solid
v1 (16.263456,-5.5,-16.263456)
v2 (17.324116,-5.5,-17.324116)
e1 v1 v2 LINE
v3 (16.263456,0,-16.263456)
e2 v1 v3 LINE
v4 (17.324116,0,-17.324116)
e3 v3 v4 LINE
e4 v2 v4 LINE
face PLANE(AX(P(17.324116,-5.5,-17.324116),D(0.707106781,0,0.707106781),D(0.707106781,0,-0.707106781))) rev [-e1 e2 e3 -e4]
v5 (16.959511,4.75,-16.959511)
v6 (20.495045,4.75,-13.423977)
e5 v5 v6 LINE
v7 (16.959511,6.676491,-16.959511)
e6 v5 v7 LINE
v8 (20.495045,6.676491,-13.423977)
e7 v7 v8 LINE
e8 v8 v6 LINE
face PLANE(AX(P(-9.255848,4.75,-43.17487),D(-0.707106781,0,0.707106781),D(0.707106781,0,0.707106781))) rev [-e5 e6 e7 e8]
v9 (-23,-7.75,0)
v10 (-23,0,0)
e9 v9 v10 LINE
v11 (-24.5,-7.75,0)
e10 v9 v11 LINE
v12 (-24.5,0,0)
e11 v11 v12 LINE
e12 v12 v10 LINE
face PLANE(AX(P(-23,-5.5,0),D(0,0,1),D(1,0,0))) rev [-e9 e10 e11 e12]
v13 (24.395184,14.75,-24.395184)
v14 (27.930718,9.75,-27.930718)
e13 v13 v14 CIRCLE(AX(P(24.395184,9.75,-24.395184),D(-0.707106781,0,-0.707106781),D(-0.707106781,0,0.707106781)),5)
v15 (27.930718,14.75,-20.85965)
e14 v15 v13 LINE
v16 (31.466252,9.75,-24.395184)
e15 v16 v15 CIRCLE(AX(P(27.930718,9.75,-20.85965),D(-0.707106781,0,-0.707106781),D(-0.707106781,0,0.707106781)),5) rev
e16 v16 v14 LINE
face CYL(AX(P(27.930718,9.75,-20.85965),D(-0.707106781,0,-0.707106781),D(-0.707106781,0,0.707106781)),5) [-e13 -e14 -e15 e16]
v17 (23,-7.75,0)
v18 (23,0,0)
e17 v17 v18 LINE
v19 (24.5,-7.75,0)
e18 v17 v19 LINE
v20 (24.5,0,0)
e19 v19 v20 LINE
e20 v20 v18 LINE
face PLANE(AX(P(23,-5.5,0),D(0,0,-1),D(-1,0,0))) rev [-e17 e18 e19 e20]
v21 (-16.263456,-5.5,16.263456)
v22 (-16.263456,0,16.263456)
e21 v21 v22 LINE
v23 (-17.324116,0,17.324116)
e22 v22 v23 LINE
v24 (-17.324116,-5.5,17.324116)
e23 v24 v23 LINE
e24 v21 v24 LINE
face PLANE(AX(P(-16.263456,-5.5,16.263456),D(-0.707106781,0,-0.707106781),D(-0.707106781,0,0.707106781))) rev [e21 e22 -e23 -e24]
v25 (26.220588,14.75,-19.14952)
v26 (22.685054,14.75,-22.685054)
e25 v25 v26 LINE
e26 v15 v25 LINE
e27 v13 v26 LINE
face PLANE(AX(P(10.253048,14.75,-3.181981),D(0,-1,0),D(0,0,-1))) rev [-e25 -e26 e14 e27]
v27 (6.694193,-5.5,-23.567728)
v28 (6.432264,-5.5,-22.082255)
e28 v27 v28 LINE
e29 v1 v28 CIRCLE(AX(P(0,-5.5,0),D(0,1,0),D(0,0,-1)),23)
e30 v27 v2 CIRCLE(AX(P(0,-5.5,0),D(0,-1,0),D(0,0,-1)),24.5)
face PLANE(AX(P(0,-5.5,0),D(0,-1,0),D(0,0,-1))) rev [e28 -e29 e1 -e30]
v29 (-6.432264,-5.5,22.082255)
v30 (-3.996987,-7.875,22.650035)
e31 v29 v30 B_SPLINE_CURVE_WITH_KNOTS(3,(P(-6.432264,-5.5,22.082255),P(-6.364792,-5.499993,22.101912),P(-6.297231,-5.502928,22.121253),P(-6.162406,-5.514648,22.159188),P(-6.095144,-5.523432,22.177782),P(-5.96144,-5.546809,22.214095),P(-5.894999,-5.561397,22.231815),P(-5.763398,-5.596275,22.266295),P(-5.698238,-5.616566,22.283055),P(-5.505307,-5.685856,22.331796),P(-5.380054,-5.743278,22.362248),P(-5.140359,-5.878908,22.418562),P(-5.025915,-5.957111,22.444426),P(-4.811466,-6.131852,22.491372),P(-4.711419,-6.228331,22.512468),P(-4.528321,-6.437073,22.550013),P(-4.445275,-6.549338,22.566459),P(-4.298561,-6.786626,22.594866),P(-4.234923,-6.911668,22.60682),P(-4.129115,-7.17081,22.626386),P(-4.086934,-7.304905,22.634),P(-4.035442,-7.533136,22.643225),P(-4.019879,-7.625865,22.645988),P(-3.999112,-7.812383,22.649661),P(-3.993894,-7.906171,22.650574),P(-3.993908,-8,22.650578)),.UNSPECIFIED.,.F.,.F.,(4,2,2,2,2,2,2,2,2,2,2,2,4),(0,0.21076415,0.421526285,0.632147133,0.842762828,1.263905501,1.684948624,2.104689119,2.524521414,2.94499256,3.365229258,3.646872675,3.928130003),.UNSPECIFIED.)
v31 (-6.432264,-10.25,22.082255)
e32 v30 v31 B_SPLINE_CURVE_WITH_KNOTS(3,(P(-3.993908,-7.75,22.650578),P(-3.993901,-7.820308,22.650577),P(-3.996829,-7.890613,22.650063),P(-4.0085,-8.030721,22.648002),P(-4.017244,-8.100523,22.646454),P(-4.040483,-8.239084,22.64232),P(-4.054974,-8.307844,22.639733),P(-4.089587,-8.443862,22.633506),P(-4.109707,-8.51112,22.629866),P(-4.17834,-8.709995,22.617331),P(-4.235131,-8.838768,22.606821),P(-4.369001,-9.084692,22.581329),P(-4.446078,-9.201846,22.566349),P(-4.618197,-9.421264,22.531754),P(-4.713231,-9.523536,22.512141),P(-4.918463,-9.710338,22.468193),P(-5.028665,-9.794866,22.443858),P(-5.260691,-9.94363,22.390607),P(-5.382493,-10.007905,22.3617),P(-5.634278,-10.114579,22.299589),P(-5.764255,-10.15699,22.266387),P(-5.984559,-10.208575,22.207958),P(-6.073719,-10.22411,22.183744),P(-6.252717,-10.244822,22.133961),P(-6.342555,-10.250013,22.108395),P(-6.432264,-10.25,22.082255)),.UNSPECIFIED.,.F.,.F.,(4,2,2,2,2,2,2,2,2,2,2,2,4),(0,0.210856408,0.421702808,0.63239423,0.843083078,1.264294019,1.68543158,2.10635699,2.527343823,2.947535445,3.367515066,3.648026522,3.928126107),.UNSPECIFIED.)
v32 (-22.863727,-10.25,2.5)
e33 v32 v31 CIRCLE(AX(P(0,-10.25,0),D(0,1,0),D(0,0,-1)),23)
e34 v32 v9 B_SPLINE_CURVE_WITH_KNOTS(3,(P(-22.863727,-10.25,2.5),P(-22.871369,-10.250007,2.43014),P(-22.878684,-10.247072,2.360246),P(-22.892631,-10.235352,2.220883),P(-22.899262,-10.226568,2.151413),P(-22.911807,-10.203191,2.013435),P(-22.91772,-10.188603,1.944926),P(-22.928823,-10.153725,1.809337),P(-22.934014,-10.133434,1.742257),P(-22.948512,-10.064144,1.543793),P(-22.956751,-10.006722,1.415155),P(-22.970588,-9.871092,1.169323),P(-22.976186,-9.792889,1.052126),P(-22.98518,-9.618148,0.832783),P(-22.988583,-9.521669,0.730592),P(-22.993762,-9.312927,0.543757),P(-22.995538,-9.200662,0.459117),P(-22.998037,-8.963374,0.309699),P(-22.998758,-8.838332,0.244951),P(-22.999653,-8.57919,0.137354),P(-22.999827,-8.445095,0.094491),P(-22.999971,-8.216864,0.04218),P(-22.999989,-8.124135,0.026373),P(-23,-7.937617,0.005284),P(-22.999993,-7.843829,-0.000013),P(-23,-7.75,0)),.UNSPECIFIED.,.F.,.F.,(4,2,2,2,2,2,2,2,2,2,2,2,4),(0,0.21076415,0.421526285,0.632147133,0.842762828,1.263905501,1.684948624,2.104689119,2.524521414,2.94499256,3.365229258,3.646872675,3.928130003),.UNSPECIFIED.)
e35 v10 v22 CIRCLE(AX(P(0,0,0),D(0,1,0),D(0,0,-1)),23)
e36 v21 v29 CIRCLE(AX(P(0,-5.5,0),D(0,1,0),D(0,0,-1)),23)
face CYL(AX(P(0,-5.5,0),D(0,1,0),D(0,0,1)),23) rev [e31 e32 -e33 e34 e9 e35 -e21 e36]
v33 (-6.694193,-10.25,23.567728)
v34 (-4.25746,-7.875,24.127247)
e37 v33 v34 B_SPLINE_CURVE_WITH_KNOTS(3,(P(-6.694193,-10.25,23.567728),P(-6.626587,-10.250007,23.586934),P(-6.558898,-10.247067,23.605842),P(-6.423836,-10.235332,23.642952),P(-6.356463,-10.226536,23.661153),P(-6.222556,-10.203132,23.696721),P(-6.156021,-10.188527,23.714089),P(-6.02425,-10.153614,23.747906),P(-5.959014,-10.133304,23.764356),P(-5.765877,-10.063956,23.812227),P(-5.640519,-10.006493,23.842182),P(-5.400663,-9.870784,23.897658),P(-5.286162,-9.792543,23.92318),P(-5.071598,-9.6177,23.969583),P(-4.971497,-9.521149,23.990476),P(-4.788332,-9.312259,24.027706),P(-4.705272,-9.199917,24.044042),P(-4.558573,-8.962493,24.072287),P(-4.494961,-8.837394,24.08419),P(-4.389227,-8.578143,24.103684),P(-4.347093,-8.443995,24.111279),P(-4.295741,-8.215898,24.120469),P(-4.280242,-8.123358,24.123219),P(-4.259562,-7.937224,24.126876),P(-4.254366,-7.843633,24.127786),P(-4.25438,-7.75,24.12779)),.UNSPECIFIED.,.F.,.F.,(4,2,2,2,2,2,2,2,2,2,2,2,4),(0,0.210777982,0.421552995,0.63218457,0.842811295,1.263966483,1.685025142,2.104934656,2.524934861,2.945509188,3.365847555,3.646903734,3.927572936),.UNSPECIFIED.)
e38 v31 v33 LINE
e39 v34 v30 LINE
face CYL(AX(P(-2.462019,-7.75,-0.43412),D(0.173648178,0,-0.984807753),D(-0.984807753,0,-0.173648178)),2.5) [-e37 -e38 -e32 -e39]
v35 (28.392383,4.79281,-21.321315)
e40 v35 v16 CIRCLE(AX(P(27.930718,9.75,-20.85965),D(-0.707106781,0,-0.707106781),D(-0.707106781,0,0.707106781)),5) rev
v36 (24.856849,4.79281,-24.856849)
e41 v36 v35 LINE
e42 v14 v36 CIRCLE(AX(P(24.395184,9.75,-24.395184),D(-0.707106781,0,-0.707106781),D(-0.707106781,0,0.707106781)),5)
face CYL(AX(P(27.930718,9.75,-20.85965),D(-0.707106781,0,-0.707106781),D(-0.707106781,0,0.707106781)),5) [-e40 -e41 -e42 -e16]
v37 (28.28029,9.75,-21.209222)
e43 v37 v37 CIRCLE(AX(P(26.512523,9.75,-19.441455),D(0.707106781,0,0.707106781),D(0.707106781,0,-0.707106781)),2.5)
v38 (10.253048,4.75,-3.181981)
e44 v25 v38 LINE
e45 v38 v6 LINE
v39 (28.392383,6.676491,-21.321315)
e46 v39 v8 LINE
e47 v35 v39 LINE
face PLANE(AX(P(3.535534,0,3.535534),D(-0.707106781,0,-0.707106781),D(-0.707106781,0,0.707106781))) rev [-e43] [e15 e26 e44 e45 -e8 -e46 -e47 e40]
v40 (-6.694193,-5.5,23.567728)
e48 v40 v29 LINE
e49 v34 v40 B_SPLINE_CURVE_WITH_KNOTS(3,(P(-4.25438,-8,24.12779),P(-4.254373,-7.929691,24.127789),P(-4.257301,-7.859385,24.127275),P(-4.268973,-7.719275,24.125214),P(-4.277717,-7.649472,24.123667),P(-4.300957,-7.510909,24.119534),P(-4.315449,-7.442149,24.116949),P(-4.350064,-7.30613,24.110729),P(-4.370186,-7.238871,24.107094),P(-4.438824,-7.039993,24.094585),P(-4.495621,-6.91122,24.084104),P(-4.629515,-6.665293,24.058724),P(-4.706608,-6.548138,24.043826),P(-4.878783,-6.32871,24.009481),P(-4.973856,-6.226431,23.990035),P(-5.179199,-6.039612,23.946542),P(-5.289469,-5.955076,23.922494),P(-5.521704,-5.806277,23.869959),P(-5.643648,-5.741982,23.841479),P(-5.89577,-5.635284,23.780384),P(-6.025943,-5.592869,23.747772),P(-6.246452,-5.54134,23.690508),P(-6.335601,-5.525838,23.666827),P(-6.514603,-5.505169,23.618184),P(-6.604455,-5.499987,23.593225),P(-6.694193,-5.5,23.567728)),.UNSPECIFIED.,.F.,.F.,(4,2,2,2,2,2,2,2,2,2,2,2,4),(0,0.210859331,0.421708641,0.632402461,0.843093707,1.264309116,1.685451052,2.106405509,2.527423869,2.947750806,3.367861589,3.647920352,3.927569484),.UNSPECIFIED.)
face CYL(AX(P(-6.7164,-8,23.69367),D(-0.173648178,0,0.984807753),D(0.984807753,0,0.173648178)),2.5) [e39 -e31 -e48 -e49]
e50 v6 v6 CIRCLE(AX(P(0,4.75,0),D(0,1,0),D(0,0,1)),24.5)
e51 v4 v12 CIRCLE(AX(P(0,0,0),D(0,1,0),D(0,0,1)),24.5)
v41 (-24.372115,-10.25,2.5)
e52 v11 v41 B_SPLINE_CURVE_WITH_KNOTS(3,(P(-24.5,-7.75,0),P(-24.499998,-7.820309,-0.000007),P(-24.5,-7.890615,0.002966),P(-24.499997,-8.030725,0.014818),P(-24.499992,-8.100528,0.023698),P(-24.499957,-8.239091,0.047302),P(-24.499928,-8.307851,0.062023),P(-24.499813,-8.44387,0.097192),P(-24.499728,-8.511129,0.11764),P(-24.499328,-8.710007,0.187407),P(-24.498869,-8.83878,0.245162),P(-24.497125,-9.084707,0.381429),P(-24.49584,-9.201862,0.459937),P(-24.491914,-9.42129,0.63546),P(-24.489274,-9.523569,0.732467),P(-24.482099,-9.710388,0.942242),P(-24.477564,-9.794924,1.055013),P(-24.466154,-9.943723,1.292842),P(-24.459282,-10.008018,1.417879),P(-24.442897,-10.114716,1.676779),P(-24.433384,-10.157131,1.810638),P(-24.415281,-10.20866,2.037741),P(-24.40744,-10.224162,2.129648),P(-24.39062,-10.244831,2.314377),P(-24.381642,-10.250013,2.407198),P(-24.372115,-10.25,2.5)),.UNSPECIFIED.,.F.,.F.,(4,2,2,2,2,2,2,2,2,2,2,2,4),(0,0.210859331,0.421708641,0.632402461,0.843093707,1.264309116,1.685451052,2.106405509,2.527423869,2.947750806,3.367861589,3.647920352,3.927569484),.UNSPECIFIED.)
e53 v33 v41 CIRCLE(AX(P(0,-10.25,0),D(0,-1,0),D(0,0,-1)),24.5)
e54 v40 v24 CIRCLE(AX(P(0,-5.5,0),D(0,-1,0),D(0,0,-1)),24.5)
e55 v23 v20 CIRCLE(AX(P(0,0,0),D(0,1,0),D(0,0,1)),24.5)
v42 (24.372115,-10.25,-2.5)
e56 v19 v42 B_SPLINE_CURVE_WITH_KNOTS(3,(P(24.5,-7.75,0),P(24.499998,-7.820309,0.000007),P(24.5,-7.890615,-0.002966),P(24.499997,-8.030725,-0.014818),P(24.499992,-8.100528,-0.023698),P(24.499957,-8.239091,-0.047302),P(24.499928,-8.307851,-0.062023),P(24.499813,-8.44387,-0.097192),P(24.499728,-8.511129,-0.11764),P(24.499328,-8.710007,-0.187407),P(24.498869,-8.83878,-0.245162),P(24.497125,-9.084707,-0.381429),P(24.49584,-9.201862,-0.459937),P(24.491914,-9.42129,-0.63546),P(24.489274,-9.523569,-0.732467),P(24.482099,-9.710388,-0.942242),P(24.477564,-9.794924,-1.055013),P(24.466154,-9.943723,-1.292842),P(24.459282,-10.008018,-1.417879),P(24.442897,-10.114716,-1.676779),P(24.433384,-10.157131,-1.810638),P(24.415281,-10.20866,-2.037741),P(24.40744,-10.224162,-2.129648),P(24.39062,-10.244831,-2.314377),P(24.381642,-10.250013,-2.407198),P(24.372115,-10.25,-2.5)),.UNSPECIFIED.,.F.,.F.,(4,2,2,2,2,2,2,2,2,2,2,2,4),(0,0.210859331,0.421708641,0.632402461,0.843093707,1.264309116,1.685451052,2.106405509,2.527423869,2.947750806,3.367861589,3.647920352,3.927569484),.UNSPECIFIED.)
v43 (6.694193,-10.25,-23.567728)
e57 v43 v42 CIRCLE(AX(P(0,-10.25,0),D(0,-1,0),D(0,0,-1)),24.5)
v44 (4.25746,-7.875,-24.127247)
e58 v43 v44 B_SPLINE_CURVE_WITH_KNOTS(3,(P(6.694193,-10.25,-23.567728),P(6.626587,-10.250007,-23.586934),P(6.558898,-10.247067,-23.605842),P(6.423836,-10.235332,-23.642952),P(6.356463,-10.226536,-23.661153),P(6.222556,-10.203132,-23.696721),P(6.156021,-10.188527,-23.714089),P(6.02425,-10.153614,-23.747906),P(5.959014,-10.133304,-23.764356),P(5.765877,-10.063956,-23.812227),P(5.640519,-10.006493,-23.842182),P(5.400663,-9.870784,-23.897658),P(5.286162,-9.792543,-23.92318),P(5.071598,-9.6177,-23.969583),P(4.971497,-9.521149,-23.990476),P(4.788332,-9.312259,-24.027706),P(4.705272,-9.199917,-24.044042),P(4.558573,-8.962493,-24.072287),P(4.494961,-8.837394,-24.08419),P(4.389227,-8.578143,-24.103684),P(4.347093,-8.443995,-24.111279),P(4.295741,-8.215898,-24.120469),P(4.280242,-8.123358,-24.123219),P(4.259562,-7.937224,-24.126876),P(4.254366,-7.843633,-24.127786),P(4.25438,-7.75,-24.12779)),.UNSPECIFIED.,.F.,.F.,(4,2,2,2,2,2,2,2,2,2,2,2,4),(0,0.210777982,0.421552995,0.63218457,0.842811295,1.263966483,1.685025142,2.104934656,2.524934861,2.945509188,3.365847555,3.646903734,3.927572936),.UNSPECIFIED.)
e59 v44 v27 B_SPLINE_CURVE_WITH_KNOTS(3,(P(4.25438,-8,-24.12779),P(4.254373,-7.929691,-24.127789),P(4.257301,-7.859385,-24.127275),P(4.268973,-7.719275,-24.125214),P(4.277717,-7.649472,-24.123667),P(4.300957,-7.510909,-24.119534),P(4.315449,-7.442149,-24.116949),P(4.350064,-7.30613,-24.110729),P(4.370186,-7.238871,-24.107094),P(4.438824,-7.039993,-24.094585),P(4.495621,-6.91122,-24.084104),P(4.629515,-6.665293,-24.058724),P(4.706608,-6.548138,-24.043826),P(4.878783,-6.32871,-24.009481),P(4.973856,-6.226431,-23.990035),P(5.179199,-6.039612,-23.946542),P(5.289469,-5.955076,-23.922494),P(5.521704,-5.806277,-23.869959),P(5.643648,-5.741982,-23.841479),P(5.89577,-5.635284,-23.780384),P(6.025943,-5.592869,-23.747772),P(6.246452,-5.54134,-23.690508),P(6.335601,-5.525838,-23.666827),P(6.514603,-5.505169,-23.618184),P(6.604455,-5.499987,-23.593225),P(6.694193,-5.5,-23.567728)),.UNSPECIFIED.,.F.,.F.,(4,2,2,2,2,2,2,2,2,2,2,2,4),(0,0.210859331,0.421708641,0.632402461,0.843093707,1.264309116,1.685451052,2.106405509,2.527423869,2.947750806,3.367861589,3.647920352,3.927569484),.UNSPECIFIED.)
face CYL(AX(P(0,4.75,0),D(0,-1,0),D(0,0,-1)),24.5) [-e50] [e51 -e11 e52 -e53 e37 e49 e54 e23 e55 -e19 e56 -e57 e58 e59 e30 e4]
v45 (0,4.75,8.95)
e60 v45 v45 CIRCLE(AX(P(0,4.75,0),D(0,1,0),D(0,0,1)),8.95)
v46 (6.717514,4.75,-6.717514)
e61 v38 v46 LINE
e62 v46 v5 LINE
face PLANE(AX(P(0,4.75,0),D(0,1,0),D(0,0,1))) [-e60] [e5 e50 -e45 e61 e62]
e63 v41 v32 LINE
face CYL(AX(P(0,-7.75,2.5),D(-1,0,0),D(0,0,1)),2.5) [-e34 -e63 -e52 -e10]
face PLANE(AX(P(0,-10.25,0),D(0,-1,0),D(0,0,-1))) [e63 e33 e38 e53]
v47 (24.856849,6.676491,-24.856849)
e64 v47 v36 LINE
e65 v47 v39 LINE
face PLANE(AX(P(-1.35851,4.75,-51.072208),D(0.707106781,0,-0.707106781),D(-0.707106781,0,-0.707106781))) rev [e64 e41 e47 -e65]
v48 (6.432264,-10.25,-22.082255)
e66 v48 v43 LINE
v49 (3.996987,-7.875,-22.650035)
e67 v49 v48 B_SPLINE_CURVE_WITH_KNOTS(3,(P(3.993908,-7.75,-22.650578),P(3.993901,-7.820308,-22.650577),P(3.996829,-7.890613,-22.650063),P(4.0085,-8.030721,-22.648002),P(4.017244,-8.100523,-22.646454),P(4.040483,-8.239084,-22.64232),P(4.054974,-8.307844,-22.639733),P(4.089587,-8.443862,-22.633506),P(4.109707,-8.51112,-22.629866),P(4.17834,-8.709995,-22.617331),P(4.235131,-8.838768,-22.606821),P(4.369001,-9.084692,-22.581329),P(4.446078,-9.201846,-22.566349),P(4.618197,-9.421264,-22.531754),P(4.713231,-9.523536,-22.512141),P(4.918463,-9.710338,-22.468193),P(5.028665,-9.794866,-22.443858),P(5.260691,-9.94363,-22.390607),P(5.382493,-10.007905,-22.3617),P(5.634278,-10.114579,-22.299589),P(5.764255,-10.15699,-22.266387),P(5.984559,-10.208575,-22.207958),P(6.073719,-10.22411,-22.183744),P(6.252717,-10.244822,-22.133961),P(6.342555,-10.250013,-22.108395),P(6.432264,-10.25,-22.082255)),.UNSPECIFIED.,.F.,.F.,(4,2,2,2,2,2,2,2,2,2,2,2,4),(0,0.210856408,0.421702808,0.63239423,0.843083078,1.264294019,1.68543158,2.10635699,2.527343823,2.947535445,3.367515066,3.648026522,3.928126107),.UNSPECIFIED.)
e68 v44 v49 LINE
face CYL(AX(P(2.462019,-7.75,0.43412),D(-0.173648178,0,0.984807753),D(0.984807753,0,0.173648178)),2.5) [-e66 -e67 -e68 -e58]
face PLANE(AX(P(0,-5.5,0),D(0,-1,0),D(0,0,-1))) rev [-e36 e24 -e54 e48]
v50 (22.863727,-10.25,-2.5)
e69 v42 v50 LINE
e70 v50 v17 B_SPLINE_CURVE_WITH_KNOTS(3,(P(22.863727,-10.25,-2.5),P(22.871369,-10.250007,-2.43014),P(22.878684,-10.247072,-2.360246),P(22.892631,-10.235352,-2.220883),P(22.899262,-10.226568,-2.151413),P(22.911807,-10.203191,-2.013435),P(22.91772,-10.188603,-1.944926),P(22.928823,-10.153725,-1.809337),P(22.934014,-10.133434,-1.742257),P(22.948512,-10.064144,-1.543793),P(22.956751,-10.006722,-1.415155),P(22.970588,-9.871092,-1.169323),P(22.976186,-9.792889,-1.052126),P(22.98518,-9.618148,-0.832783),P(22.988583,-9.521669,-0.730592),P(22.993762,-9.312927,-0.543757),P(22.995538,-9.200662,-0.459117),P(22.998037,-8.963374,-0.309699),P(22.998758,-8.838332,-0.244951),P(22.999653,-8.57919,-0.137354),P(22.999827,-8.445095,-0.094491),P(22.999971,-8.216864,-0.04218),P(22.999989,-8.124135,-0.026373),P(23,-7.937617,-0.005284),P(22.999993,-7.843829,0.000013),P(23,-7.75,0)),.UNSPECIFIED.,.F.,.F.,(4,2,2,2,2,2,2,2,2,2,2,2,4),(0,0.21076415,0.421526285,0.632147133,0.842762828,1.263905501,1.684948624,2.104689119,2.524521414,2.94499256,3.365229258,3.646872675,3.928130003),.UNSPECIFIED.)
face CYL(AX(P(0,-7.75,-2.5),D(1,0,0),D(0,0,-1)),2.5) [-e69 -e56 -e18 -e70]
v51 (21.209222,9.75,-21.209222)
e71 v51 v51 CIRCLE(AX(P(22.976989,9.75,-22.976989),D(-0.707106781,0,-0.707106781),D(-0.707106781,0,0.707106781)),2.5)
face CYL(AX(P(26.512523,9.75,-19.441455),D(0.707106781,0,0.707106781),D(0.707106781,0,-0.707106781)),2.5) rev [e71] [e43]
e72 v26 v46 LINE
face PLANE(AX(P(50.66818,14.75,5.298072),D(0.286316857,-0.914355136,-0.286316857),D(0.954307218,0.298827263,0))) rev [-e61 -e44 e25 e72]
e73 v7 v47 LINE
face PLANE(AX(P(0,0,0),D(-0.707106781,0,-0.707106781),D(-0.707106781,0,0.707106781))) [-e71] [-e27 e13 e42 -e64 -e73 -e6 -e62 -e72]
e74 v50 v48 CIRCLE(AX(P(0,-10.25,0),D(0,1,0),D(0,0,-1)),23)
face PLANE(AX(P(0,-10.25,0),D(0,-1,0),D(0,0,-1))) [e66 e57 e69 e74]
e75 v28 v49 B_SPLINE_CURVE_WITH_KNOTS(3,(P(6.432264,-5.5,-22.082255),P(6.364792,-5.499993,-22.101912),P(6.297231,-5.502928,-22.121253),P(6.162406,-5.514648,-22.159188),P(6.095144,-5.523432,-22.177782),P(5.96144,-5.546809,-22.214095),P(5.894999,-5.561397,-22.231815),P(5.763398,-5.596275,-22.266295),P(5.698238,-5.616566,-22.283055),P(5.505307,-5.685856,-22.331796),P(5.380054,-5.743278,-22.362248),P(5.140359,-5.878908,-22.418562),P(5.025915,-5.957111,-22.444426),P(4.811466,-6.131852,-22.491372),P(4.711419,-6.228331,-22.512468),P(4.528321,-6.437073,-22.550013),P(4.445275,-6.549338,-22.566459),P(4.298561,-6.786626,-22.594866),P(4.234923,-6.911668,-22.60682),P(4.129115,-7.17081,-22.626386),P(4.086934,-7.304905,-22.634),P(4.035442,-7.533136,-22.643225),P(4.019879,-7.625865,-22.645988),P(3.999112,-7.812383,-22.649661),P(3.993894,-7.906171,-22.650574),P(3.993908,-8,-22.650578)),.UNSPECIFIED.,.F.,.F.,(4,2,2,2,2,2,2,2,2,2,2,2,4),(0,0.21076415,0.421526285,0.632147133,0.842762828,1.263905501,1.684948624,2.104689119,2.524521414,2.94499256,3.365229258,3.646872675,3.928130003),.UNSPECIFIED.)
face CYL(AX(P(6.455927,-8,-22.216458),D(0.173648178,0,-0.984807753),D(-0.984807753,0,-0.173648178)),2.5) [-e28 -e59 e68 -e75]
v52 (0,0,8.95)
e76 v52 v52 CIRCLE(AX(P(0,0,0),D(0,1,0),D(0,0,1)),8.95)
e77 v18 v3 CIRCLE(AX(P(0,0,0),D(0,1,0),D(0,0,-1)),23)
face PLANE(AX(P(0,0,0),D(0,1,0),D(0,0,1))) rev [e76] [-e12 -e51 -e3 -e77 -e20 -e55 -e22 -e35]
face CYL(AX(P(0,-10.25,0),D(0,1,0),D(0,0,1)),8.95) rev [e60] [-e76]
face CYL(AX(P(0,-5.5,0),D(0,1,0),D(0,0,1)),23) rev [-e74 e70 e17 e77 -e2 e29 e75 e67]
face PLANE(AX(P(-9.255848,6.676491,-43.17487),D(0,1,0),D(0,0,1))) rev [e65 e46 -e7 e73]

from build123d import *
from build123d.topology import SkipClean

# Parameters (mm, degrees)
SKETCH_1_R          = 24.5
EXTRUDE_1_DEPTH     = 4.75
EXTRUDE_START       = 5.5
EXTRUDE_2_DEPTH     = 5.5
EXTRUDE_START_2     = 4.75
EXTRUDE_3_DEPTH     = 4.75
SKETCH_6_R          = 8.95
CUT_EXTRUDE_1_DEPTH = 38.755794257
SKETCH_8_W          = 30
SKETCH_8_H          = 10
EXTRUDE_4_DEPTH     = 5
FILLET_1_R          = 10
FILLET_2_R          = 5
MM_1_D              = 5
SKETCH_11_W         = 11.168523271
SKETCH_11_H         = 1.926491066
CUT_EXTRUDE_2_DEPTH = 45.650628903
CUT_EXTRUDE_3_DEPTH = 45.584890939
FILLET_3_R          = 2.5


# Some blends are built 0.0001 mm under size
with BuildPart() as part:
    # 草图1 → 凸台-拉伸1 (new body)
    with BuildSketch(Plane(origin=(0, 0, 0), x_dir=(1, 0, 0), z_dir=(0, 1, 0))):
        with Locations(Location((0, 0, 0), (0, 0, 270))):
            Circle(SKETCH_1_R)
    extrude(amount=EXTRUDE_1_DEPTH)

    # 草图4 → 凸台-拉伸2 (add)
    with BuildSketch(Plane.XZ.offset(EXTRUDE_START)):
        with BuildLine():
            Line((-23, 0), (-24.5, 0))
            ThreePointArc((-24.5, 0), (-22.635048547, 9.375744093), (-17.324116139, 17.324116139))
            Line((-17.324116139, 17.324116139), (-16.263455967, 16.263455967))
            ThreePointArc((-16.263455967, 16.263455967), (-21.249229248, 8.801718944), (-23, 0))
        make_face()
        with BuildLine():
            Line((23, 0), (24.5, 0))
            ThreePointArc((24.5, 0), (22.635048547, -9.375744093), (17.324116139, -17.324116139))
            Line((17.324116139, -17.324116139), (16.263455967, -16.263455967))
            ThreePointArc((16.263455967, -16.263455967), (21.249229248, -8.801718944), (23, 0))
        make_face()
    extrude(amount=-EXTRUDE_2_DEPTH)

    # 草图5 → 凸台-拉伸3 (add)
    with SkipClean():  # the faces are left unmerged after this step: merging them gives an invalid solid
        with BuildSketch(Plane.XZ.offset(5.5).offset(EXTRUDE_START_2)):
            with BuildLine():
                Line((-23, 0), (-24.5, 0))
                ThreePointArc((-24.5, 0), (-18.768088856, 15.748296437), (-4.254380353, 24.127789949))
                Line((-4.254380353, 24.127789949), (-3.993908086, 22.650578319))
                ThreePointArc((-3.993908086, 22.650578319), (-17.619022192, 14.784115023), (-23, 0))
            make_face()
            with BuildLine():
                Line((3.993908086, -22.650578319), (4.254380353, -24.127789949))
                ThreePointArc((4.254380353, -24.127789949), (18.768088856, -15.748296437), (24.5, 0))
                Line((24.5, 0), (23, 0))
                ThreePointArc((23, 0), (17.619022192, -14.784115023), (3.993908086, -22.650578319))
            make_face()
        extrude(amount=-EXTRUDE_3_DEPTH)

    # 草图6 → 切除-拉伸1 (cut, through all)
    with SkipClean():  # the faces are left unmerged after this step: merging them gives an invalid solid
        with BuildSketch(Plane(origin=(0, 4.75, 0), x_dir=(1, 0, 0), z_dir=(0, 1, 0))):
            with Locations(Location((0, 0, 0), (0, 0, 270))):
                Circle(SKETCH_6_R)
        extrude(amount=-CUT_EXTRUDE_1_DEPTH, mode=Mode.SUBTRACT)

    # 草图8 → 凸台-拉伸4 (add)
    with SkipClean():  # the faces are left unmerged after this step: merging them gives an invalid solid
        with BuildSketch(Plane(origin=(0, 0, 0), x_dir=(0.7071067811865489, 0, -0.7071067811865462), z_dir=(0.7071067811865462, 0, 0.7071067811865489))):
            with Locations((24.5, 9.75)):
                Rectangle(SKETCH_8_W, SKETCH_8_H)
        extrude(amount=EXTRUDE_4_DEPTH)

    # 圆角1
    fillet_1_edges = [part.edges().sort_by_distance(p)[0] for p in [
        (8.485281374, 14.75, -4.949747468),
    ]]
    fillet(fillet_1_edges, radius=FILLET_1_R - 0.0001)  # a hair under: the kernel refuses the full size

    # 圆角2
    fillet_2_edges = [part.edges().sort_by_distance(p)[0] for p in [
        (29.69848481, 14.75, -26.162950904),
        (29.69848481, 4.75, -26.162950904),
    ]]
    fillet(fillet_2_edges, radius=FILLET_2_R - 0.0001)  # a hair under: the kernel refuses the full size

    # 大小mm 暗销孔1 (through all)
    with Locations(Plane(origin=(3.535533906, 0, 3.535533906), x_dir=(0.7071067811865488, 0, -0.7071067811865462), z_dir=(0.7071067811865462, 0, 0.7071067811865488))):
        with Locations((32.49436991, 9.75)):
            Hole(MM_1_D / 2)

    # 草图11 → 切除-拉伸2 (cut, through all)
    with BuildSketch(Plane(origin=(3.535533906, 0, 3.535533906), x_dir=(0.7071067811865489, 0, -0.7071067811865461), z_dir=(0.7071067811865461, 0, 0.7071067811865489))):
        with Locations((29.568631546, 5.713245533)):
            Rectangle(SKETCH_11_W, SKETCH_11_H)
    extrude(amount=-CUT_EXTRUDE_2_DEPTH, mode=Mode.SUBTRACT)

    # 草图12 → 切除-拉伸3 (cut, through all)
    with BuildSketch(Plane(origin=(0, 0, 0), x_dir=(-0.7071067811865489, 0, 0.7071067811865461), z_dir=(-0.7071067811865461, 0, -0.7071067811865489))):
        with BuildLine():
            Line((-32.081510731, 14.75), (-9.5, 4.75))
            ThreePointArc((-9.5, 4.75), (-12.428932188, 11.821067812), (-19.5, 14.75))
            Line((-19.5, 14.75), (-32.081510731, 14.75))
        make_face()
    extrude(amount=-CUT_EXTRUDE_3_DEPTH, mode=Mode.SUBTRACT)


with BuildPart() as cut_extrude_3_kept_piece:
    # of the separate pieces the step leaves, the one the design keeps (cut_extrude_3_pieces_kept)
    add(part.part.solids().sort_by_distance((24.395254662, 14.75, -24.395254662))[0])

    # 圆角3
    # the kernel refuses this fillet: 2.5 mm, written as the material it takes off along each edge
    with BuildSketch(Plane(origin=(-16.75, -10.25, 0), x_dir=(0, 1, 0), z_dir=(-1, 0, 0)), Plane(origin=(2.908606976, -10.25, -16.495529863), x_dir=(0.9848077530122085, 0, 0.17364817766692725), z_dir=(0.17364817766692725, 0, -0.9848077530122086)), Plane(origin=(30.75, -10.25, 0), x_dir=(0, 0, -1), z_dir=(-1, 0, 0))) as fillet_3_piece_1:
        with BuildLine():
            CenterArc((FILLET_3_R, -FILLET_3_R), FILLET_3_R, 90, 90)
            Line((0, -FILLET_3_R), (0, 0))
            Line((0, 0), (FILLET_3_R, 0))
        make_face()
    extrude(amount=14, mode=Mode.SUBTRACT)
    with BuildSketch(Plane(origin=(2.908606976, -5.5, -16.495529863), x_dir=(0.9848077530122085, 0, 0.17364817766692725), z_dir=(0.17364817766692725, 0, -0.9848077530122086)), Plane(origin=(-5.339681463, -5.5, 30.282838405), x_dir=(0, -1, 0), z_dir=(0.17364817766692875, 0, -0.9848077530122084)), Plane(origin=(-5.339681463, -10.25, 30.282838405), x_dir=(-0.9848077530122084, 0, -0.17364817766692872), z_dir=(0.17364817766692875, 0, -0.9848077530122084))) as fillet_3_piece_2:
        with BuildLine():
            CenterArc((FILLET_3_R, FILLET_3_R), FILLET_3_R, 180, 90)
            Line((0, FILLET_3_R), (0, 0))
            Line((0, 0), (FILLET_3_R, 0))
        make_face()
    extrude(amount=14, mode=Mode.SUBTRACT)


solid = cut_extrude_3_kept_piece.part
